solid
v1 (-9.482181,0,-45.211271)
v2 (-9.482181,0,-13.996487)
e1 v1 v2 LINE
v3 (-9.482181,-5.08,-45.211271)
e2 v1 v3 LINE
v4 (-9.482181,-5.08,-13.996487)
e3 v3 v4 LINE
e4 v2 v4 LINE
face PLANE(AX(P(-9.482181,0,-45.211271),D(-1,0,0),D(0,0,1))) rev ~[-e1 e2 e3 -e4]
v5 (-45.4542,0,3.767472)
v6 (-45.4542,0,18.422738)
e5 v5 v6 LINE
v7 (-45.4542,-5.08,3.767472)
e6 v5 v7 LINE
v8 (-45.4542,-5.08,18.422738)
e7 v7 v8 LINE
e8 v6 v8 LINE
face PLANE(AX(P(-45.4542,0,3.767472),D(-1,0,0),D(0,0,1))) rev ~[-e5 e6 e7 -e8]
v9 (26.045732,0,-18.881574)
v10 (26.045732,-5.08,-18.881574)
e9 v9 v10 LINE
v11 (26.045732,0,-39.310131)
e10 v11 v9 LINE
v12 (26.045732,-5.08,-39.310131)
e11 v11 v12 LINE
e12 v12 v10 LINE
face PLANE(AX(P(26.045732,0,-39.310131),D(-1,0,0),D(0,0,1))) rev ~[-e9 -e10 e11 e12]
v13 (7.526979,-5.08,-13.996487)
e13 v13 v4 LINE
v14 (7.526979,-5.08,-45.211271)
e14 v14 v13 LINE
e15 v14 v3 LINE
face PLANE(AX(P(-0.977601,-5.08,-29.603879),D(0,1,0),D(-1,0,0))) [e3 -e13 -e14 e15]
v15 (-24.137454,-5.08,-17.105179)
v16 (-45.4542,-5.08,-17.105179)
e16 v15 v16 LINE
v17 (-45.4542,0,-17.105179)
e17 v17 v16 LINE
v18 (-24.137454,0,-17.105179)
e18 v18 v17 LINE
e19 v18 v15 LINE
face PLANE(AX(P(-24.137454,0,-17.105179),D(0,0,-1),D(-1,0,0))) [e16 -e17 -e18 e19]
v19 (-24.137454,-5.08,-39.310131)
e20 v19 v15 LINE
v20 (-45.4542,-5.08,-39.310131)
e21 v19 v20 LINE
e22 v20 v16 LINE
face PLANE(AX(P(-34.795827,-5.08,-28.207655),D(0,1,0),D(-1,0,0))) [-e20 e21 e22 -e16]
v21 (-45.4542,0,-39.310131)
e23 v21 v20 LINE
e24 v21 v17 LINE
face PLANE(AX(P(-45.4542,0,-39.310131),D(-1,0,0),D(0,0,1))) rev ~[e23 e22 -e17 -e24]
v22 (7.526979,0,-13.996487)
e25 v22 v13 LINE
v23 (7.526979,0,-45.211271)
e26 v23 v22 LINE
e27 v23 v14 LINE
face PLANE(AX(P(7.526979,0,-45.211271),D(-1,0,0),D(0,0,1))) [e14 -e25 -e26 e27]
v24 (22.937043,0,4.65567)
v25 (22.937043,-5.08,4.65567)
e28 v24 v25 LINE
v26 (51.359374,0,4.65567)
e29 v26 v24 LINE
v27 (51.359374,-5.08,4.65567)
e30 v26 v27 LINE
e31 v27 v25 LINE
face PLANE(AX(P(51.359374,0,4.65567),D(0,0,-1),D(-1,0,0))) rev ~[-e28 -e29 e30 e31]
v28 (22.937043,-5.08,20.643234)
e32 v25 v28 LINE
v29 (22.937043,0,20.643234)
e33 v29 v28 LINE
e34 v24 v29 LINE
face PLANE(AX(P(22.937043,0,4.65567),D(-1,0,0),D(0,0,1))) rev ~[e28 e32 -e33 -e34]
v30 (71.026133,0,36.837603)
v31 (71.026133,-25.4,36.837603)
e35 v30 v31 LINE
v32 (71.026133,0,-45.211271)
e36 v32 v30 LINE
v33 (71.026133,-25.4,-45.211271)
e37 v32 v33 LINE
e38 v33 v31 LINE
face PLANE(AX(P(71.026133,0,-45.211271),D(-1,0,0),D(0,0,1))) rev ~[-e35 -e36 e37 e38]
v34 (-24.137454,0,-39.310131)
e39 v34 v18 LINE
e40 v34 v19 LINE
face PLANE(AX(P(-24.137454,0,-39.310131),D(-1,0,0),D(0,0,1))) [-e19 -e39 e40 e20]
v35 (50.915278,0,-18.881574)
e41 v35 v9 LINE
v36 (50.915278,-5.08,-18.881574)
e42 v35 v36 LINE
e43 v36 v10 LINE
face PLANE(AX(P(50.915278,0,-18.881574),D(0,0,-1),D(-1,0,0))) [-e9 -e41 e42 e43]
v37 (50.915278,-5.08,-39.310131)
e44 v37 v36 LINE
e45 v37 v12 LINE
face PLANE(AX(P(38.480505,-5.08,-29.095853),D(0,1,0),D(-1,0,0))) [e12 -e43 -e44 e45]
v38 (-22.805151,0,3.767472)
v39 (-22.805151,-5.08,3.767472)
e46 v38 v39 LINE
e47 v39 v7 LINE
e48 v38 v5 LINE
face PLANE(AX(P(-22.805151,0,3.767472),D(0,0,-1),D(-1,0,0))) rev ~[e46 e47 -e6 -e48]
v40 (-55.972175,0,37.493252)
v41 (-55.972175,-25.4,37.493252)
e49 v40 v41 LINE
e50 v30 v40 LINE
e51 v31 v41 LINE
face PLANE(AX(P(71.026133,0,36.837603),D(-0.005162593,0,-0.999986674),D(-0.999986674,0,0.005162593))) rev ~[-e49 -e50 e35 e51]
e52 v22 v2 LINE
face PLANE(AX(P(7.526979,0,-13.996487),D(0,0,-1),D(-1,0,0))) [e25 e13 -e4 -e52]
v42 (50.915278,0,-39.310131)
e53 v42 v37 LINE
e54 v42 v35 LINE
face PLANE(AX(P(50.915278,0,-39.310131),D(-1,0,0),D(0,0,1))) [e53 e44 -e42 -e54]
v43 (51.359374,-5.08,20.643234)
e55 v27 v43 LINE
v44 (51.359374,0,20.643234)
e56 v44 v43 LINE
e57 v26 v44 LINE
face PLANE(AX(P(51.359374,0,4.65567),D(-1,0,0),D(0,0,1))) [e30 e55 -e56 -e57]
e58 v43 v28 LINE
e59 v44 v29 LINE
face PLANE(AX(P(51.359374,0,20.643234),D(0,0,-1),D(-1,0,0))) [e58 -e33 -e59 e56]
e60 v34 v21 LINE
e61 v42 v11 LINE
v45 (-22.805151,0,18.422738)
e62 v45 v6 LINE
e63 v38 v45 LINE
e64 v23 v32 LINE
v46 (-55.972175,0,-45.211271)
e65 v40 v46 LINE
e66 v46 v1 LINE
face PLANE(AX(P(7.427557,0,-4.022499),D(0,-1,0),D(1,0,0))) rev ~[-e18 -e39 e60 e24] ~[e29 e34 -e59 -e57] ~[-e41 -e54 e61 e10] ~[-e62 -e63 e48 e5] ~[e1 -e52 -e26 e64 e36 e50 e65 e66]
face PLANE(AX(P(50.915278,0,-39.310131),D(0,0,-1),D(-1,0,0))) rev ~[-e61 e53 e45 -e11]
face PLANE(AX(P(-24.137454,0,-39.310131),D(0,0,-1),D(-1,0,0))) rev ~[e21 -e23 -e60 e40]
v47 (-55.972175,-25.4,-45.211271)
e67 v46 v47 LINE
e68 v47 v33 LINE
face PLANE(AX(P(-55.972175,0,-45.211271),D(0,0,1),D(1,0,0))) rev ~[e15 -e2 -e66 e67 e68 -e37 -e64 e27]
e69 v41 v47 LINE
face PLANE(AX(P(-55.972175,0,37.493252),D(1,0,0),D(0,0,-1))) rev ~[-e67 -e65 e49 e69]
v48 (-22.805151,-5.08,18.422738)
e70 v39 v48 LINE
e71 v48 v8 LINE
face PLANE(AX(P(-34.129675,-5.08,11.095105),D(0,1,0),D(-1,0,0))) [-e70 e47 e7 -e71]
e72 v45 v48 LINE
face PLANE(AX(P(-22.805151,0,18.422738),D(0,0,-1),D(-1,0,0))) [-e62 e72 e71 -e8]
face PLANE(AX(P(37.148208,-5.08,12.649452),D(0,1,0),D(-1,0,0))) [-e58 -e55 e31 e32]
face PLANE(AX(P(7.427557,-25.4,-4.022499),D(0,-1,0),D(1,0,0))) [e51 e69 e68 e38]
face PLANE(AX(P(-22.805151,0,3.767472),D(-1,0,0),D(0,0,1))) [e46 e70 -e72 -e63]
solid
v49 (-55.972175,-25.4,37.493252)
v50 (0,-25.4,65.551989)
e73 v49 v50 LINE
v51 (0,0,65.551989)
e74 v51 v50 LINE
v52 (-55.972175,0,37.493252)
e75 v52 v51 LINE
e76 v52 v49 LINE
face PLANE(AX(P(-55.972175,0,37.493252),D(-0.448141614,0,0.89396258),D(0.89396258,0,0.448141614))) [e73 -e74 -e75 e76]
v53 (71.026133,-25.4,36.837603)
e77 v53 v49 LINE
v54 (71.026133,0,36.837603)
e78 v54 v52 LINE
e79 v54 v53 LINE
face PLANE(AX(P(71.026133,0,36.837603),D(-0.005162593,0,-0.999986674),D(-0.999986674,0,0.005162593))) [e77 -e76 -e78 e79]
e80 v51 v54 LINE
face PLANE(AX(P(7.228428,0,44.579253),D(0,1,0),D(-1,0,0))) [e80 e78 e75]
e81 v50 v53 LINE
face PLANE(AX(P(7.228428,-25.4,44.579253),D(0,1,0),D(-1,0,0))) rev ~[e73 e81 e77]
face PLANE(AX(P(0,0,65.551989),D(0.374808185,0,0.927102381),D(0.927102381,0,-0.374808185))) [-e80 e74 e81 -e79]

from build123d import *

# Parameters (mm, degrees)
F1_DEPTH = 25.4
F2_W     = 28.4223314375
F2_H     = 15.9875638783
F2_W_2   = 22.6490497589
F2_H_2   = 14.6552654915
F2_W_3   = 21.3167462498
F2_H_3   = 22.2049523145
F2_W_4   = 17.0091595501
F2_H_4   = 31.2147845337
F2_W_5   = 24.8695462942
F2_H_5   = 20.4285569489
F3_DEPTH = 5.08
F5_DEPTH = 25.4


# Not quite as in the source:
# - a feature names something its author has since deleted; it is built from what else it names


with BuildPart() as f1:
    # F0 (on Front) → F1 (new body)
    with BuildSketch(Plane.XZ):
        Polygon((-55.9721749313, 37.4932518983), (-55.9721749313, -45.2112710858), (71.026132632, -45.2112710858), (71.026132632, 36.8376025469), align=None)
    extrude(amount=F1_DEPTH)

    # F2 (on face) → F3 (cut)
    with BuildSketch(Plane(origin=(0, 0, 0), x_dir=(-1, 0, 0), z_dir=(0, 1, 0))):
        with Locations((-37.1482083574, 12.6494523138)):
            Rectangle(F2_W, F2_H)
        with Locations((34.1296754777, 11.0951049719)):
            Rectangle(F2_W_2, F2_H_2)
        with Locations((34.7958272323, -28.2076550648)):
            Rectangle(F2_W_3, F2_H_3)
        with Locations((0.9776009247, -29.6038788189)):
            Rectangle(F2_W_4, F2_H_4)
        with Locations((-38.4805053473, -29.0958527476)):
            Rectangle(F2_W_5, F2_H_5)
    extrude(amount=-F3_DEPTH, mode=Mode.SUBTRACT)


with BuildPart() as f5:
    # F4 (on face) → F5 (new body)
    with BuildSketch(Plane(origin=(0, 0, 0), x_dir=(-1, 0, 0), z_dir=(0, 1, 0))):
        Polygon((0, 65.5519887805), (-71.026132632, 36.8376025469), (55.9721749313, 37.4932518983), align=None)
    extrude(amount=-F5_DEPTH)


solid = Compound([f1.part, f5.part])
